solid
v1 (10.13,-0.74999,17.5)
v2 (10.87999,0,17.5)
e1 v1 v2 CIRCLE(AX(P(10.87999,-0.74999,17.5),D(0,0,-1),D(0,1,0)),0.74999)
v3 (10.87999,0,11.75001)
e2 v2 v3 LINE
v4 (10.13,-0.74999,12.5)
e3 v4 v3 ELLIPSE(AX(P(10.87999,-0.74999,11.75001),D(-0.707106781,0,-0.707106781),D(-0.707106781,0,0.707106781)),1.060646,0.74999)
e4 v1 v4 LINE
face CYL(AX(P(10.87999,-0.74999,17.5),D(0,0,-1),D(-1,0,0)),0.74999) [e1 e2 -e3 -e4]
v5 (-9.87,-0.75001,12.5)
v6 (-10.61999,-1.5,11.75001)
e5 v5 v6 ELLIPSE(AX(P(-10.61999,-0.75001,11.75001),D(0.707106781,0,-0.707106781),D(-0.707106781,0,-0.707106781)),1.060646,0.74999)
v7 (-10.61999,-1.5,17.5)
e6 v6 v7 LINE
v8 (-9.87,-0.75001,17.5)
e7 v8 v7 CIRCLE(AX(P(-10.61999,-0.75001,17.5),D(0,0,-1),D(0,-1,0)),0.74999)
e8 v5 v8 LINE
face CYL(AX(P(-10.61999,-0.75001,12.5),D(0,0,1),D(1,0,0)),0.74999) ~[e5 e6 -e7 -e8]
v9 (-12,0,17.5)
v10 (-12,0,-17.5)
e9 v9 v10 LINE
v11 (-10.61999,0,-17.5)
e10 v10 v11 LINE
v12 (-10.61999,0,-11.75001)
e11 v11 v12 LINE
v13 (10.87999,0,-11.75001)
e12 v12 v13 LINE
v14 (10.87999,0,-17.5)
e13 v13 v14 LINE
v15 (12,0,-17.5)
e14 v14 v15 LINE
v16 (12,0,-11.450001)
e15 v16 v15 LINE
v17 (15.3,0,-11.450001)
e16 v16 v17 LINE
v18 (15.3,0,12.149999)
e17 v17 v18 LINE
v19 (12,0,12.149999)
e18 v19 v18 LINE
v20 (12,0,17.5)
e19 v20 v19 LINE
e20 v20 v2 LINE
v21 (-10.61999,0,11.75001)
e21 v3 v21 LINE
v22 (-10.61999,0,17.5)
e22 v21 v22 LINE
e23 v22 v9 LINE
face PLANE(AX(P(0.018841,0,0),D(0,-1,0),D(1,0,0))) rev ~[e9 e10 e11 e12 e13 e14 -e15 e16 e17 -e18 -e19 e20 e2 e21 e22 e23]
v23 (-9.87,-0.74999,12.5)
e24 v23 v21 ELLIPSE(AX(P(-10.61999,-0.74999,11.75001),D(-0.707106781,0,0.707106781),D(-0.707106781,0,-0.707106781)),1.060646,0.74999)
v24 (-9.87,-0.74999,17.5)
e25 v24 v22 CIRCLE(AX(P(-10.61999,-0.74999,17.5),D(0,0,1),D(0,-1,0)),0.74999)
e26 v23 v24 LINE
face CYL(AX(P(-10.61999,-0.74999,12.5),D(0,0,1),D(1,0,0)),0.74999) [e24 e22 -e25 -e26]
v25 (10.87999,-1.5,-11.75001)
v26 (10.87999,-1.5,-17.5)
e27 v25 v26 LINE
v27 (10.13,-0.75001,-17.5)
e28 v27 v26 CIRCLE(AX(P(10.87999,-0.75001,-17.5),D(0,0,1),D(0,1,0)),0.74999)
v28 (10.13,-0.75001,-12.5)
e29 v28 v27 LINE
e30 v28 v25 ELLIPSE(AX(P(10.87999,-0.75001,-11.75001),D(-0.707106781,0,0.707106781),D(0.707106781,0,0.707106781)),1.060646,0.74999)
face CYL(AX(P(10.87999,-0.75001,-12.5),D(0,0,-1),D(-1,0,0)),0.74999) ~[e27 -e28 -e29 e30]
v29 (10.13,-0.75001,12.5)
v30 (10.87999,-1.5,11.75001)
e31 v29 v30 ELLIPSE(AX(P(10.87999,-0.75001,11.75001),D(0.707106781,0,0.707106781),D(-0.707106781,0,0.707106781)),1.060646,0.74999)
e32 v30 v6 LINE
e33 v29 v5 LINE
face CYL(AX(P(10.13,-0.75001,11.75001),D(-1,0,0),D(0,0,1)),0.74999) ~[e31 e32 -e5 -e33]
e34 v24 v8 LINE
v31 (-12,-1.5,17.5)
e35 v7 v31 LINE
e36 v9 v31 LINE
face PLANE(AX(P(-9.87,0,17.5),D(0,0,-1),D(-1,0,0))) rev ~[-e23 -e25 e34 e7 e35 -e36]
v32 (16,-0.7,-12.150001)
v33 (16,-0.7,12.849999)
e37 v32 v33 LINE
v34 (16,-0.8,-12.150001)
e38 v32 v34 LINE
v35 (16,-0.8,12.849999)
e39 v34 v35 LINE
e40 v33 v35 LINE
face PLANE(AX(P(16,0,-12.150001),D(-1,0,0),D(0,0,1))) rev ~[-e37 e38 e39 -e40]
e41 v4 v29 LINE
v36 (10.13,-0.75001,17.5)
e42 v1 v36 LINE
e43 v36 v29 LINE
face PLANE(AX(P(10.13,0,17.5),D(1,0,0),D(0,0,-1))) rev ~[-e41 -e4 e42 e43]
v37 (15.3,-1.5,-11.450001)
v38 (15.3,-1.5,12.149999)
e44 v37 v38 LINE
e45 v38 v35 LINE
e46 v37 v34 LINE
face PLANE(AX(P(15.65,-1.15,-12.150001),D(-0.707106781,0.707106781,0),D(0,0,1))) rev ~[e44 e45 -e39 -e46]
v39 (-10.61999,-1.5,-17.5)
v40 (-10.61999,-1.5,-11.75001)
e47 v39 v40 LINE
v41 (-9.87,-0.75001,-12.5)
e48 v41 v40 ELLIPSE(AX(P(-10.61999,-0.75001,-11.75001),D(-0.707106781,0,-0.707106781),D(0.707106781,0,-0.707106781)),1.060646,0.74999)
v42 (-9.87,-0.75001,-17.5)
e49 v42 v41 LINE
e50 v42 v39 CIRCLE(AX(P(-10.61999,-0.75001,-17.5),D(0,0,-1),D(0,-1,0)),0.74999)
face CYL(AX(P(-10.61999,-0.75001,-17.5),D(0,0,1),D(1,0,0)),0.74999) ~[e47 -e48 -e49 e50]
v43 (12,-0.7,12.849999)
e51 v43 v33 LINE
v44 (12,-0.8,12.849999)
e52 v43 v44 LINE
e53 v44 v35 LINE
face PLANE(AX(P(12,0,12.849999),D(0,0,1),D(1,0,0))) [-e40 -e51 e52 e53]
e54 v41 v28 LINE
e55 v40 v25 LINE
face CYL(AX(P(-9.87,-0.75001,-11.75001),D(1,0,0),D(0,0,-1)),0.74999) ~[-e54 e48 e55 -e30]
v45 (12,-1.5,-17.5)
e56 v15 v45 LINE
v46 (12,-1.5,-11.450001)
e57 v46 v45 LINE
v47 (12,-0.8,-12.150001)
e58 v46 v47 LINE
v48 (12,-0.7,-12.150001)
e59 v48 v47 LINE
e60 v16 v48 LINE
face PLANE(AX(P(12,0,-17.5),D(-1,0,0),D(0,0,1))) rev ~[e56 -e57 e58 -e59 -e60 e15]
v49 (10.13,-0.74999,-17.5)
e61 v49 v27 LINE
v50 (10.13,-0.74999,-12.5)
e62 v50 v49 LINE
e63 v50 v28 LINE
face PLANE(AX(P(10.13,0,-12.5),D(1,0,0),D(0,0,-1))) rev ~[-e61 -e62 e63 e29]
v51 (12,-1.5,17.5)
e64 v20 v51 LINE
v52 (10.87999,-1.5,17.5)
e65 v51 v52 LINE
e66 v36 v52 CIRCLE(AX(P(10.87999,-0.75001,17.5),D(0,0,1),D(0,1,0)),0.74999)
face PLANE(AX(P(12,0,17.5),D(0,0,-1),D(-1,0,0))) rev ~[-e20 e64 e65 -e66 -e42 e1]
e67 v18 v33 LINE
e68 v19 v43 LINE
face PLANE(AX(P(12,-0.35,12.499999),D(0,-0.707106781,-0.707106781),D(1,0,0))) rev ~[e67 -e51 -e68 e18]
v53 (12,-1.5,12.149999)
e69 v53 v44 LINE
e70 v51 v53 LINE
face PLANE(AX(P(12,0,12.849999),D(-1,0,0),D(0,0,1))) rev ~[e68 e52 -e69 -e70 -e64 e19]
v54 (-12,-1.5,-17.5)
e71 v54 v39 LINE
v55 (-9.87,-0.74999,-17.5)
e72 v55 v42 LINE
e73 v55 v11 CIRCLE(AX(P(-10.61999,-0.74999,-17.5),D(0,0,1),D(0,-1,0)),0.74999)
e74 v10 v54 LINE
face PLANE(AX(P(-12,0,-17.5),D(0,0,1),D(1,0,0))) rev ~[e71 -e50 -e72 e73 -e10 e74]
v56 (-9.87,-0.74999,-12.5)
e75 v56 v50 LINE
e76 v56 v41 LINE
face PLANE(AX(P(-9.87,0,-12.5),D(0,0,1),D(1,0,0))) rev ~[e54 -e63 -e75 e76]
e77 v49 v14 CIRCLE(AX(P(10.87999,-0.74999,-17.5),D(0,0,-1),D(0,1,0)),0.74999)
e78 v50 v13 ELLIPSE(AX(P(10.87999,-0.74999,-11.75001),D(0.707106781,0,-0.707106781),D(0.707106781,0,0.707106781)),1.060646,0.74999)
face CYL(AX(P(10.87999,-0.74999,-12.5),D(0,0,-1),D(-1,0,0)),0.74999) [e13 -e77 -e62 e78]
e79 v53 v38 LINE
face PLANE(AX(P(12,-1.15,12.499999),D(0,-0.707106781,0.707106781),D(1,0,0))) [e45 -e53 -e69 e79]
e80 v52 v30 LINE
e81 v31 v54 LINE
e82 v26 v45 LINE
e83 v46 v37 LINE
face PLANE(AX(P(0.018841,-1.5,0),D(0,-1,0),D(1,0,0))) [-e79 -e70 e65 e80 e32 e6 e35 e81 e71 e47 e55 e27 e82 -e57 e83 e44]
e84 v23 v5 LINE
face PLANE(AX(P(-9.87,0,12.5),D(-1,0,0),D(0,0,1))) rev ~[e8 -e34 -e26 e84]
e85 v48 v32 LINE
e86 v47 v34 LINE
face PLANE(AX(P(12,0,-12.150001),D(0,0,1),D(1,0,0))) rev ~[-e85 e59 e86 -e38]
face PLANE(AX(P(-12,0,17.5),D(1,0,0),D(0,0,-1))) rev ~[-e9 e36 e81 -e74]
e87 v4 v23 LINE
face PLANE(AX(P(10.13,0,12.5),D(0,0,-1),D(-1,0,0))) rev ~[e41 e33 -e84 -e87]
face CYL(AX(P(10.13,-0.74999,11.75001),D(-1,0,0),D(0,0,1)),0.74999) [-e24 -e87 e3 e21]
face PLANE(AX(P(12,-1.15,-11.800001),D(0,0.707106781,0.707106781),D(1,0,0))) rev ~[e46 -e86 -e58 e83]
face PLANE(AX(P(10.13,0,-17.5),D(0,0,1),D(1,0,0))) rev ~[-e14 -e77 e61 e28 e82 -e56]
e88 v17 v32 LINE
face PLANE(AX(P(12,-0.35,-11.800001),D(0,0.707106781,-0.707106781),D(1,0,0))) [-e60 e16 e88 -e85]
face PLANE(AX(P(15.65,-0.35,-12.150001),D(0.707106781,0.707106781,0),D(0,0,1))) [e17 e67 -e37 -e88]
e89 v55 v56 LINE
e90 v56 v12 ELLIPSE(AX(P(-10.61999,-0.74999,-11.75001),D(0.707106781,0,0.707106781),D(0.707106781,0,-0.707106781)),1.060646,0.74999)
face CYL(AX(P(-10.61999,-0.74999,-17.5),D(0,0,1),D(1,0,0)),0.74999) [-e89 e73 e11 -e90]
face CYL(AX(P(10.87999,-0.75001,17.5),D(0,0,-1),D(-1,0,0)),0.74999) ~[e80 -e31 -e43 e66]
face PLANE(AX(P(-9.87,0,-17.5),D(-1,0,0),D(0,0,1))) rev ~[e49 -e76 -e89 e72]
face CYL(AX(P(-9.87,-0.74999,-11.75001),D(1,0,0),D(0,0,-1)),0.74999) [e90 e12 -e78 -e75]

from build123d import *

# Parameters (mm, degrees)
F0_W     = 4
F0_H     = 25
F1_DEPTH = 1.5
F2_R     = 0.74999
F3_SIZE  = 0.7


# Not quite as in the source:
# - a fillet or chamfer is up to 0.001 mm smaller than in the source, because OpenCascade refuses the exact size


with BuildPart() as f1:
    # F0 (on Front) → F1 (new body)
    with BuildSketch(Plane.XZ):
        Polygon((-9.8700001836, 17.5), (-12, 17.5), (-12, -17.5), (-9.8700001836, -17.5), (-9.8700001836, -12.5), (10.1299998164, -12.5), (10.1299998164, -17.5), (12, -17.5), (12, -12.1500007808), (12, 12.8499992192), (12, 17.5), (10.1299998164, 17.5), (10.1299998164, 12.5), (-9.8700001836, 12.5), align=None)
        with Locations((14, 0.3499992192)):
            Rectangle(F0_W, F0_H)
    extrude(amount=F1_DEPTH)

    # F2 (radius 0.75 in the source; OpenCascade refuses exactly that, so slightly less here)
    f2_edges = [f1.edges().sort_by_distance(p)[0] for p in [
        (0.13, -1.5, 12.5),
        (0.13, -1.5, -12.5),
        (0.13, 0, -12.5),
        (0.13, 0, 12.5),
        (10.13, 0, 15),
        (-9.87, 0, 15),
        (-9.87, -1.5, 15),
        (-9.87, -1.5, -15),
        (-9.87, 0, -15),
        (10.13, -1.5, -15),
        (10.13, 0, -15),
        (10.13, -1.5, 15),
    ]]
    fillet(f2_edges, radius=F2_R)

    # F3
    f3_edges = [f1.edges().sort_by_distance(p)[0] for p in [
        (16, -1.5, 0.349999),
        (16, 0, 0.349999),
        (14, -1.5, -12.150001),
        (14, 0, -12.150001),
        (14, 0, 12.849999),
        (14, -1.5, 12.849999),
    ]]
    chamfer(f3_edges, length=F3_SIZE)


solid = f1.part
